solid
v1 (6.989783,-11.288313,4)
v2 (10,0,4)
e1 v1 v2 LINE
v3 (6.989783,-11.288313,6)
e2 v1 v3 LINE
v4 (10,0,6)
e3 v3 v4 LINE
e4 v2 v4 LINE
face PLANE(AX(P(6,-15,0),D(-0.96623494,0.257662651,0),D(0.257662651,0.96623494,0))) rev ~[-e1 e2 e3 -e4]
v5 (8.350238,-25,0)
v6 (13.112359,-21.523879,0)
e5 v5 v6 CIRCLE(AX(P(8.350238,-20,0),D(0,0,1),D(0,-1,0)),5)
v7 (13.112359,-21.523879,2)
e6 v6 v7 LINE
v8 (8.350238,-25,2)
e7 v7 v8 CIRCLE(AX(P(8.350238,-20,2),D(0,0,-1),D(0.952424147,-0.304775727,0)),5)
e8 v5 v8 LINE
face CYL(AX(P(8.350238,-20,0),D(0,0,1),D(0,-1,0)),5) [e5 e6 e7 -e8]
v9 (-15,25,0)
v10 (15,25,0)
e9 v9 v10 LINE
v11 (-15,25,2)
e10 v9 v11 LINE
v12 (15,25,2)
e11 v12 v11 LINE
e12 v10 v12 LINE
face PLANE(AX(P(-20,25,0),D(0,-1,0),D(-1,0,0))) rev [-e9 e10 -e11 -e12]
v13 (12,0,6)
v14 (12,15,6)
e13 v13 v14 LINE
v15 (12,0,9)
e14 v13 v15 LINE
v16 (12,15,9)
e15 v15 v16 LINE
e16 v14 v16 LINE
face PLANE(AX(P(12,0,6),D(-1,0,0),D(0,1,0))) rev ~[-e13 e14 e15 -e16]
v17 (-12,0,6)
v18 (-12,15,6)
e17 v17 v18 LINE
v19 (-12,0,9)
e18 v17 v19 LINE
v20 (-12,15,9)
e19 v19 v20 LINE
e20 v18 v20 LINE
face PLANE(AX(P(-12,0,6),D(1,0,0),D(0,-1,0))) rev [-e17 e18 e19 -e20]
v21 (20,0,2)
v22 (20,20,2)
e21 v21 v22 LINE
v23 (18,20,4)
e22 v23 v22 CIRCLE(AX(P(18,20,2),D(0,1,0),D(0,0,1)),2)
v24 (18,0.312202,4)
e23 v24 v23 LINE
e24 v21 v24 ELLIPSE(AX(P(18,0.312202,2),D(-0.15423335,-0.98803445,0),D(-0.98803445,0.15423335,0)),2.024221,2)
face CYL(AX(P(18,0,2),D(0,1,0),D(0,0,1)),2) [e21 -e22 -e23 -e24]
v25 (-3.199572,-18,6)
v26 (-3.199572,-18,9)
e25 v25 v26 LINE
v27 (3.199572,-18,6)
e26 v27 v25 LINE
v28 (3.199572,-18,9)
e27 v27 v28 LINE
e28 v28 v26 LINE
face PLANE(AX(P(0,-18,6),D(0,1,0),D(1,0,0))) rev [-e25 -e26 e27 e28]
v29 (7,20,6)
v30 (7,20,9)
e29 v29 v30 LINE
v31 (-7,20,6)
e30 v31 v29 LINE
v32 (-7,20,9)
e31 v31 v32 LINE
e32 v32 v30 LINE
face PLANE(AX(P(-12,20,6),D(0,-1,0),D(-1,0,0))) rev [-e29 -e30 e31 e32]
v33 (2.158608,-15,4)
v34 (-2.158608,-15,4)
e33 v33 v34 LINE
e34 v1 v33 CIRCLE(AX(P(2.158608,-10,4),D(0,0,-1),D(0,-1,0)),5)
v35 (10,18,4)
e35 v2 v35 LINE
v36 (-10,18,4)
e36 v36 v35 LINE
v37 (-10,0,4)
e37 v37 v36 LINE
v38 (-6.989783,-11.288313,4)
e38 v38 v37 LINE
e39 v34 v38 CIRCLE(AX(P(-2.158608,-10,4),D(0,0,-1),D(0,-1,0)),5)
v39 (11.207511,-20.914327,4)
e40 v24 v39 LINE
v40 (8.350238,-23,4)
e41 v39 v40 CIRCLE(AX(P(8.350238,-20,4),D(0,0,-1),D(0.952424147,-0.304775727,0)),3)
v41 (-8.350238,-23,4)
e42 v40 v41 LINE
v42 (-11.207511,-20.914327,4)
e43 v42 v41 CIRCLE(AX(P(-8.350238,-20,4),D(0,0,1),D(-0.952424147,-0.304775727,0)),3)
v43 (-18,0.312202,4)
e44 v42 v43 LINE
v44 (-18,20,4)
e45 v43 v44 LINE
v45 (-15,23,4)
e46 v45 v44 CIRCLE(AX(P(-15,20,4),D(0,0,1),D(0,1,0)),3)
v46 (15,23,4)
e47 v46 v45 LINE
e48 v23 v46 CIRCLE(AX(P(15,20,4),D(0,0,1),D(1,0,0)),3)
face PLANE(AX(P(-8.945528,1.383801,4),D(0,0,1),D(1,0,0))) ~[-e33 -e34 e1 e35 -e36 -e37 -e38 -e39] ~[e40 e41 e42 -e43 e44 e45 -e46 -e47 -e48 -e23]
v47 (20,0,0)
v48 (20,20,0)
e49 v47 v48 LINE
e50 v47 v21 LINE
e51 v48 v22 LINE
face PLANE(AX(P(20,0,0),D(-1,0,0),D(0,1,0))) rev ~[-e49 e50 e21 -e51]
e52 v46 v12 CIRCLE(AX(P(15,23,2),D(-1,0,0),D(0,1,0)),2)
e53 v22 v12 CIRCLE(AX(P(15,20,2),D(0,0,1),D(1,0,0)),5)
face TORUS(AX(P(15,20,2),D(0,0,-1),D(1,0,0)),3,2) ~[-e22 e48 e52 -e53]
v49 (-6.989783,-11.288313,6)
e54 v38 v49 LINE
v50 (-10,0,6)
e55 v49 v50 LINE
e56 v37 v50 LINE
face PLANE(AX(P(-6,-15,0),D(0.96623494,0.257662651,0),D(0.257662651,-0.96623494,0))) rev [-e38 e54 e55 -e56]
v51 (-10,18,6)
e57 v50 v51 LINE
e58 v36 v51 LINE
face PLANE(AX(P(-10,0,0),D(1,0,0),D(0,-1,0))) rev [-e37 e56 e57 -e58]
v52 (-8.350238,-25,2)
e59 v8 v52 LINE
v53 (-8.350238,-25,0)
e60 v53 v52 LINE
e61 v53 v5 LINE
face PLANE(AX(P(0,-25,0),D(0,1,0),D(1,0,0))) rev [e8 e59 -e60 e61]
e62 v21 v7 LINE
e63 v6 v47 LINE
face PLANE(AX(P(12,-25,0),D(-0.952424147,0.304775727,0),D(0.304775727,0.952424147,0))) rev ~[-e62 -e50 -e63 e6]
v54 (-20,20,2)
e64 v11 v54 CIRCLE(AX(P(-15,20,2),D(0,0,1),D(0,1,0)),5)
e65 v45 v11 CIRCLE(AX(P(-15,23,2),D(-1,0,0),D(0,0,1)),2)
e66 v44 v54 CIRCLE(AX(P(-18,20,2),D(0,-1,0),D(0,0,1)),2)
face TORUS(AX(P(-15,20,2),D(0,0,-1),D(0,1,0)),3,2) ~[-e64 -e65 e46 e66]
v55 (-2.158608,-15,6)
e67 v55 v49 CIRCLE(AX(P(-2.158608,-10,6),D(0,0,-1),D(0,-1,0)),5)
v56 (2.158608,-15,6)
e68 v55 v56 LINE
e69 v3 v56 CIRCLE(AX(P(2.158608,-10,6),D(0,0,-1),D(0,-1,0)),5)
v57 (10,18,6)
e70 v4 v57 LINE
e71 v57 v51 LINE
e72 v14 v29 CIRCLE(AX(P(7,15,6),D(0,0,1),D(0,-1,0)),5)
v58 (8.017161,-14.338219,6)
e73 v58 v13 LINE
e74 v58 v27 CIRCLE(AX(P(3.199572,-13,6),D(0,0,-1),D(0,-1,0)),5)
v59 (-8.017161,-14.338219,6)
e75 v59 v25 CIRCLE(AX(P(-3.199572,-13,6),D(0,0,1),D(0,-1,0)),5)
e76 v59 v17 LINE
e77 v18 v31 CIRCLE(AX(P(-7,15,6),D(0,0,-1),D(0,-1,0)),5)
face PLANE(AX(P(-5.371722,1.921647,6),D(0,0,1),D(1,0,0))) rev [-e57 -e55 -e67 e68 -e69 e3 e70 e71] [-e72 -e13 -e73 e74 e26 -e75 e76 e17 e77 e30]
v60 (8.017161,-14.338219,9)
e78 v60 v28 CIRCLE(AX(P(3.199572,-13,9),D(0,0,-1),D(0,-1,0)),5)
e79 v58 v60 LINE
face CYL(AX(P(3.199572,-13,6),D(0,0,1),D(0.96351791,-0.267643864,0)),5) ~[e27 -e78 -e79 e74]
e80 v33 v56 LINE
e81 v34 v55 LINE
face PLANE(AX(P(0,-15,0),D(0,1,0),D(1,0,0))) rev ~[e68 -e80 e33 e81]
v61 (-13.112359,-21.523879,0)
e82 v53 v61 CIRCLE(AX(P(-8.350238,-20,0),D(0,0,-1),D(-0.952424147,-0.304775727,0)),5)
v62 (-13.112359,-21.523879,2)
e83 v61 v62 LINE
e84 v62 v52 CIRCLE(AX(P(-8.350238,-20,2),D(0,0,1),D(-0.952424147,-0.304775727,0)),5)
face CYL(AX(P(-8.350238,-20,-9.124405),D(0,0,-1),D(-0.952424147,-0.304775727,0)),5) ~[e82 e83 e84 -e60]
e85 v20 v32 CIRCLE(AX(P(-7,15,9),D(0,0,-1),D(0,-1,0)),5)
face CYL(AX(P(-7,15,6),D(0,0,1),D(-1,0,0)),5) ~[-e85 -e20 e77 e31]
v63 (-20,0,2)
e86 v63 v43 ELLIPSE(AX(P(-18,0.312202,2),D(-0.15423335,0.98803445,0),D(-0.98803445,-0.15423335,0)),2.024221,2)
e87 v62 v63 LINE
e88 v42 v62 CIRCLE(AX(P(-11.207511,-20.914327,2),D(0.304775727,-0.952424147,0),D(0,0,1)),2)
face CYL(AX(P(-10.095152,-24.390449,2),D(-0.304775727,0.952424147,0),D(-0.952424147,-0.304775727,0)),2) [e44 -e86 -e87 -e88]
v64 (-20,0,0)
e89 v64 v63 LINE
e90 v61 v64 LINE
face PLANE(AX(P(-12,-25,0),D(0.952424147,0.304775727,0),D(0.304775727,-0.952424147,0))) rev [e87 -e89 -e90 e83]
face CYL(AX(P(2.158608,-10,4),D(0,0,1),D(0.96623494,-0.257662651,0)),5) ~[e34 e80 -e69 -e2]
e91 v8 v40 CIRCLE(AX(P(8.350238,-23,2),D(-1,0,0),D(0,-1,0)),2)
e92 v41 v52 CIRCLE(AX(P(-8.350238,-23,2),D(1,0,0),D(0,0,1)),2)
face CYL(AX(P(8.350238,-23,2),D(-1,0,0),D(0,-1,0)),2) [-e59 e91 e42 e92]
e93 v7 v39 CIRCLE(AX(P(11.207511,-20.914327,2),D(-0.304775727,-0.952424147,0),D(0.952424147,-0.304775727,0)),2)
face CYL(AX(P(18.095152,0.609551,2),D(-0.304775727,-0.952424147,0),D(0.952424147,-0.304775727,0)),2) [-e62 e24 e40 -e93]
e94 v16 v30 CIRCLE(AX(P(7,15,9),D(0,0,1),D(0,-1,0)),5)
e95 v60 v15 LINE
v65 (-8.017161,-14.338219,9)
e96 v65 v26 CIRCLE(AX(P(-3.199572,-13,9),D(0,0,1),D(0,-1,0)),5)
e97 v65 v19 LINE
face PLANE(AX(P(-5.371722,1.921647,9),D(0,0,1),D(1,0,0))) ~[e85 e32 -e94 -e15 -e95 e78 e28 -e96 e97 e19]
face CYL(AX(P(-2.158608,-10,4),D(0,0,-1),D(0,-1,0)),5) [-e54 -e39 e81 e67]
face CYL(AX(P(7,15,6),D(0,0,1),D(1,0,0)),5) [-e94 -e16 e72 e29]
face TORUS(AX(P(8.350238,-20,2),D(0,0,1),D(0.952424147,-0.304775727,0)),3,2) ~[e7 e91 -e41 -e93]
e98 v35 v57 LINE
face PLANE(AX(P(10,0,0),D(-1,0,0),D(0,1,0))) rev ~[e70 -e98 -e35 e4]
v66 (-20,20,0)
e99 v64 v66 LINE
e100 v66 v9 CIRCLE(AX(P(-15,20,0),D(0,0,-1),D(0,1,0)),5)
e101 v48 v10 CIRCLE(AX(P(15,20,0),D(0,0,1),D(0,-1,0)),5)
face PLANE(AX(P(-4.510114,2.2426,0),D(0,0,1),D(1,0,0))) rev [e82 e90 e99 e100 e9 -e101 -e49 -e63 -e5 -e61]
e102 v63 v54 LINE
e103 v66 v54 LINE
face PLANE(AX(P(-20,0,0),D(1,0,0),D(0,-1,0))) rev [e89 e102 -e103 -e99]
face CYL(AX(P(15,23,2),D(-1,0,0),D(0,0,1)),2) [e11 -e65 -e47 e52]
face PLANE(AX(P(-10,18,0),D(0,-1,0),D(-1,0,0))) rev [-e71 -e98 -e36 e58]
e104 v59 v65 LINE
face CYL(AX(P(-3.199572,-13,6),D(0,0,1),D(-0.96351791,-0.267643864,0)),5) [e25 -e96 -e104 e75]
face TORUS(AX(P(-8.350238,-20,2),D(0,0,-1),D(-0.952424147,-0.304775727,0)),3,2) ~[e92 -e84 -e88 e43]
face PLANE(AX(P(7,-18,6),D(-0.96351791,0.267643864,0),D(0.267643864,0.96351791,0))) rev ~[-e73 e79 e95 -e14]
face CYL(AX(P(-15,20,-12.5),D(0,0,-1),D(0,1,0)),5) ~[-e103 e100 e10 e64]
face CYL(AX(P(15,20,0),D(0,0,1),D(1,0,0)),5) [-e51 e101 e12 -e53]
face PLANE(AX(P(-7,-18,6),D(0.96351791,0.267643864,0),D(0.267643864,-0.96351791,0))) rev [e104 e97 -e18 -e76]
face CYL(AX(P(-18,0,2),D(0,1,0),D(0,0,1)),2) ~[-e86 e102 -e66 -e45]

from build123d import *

# Parameters (mm, degrees)
F1_DEPTH        = 4
F2_R            = 5
F3_R            = 2
F5_DEPTH        = 6
F6_R            = 5
F8_DEPTH        = 3
F10_F1_R        = 5
F10_F2_R        = 5
F10_2_T1_DEPTH  = 11.6034789136
F10_2_T3_DEPTH  = 16.5
F10_2_T5_DEPTH  = 13.1244047484
F10_2_T8_ANGLE  = 72.2553283749
F10_2_T10_ANGLE = 90


# Not quite as in the source:
# - a fillet or chamfer that OpenCascade refuses, or shapes differently, is made with other operations: its cross-section is extruded or revolved along the edge and cut away or added
# - a pattern or mirror of a feature is missing from the dataset's text; its kind, count and spacing are read off the source's solid


with BuildPart() as f1:
    # F0 (on Top) → F1 (new body)
    with BuildSketch(Plane.XY):
        Polygon((0, 25), (0, 0), (0, -25), (12, -25), (20, 0), (20, 25), align=None)
    extrude(amount=F1_DEPTH)

    # F1_copies: F1 across plane


with BuildPart() as f1_1:
    add(f1.part)
    add(f1.part.mirror(Plane(origin=(0, 0, 0), x_dir=(0, 0, -1), z_dir=(-1, 0, 0))))

    # F2
    f2_edges = [f1_1.edges().sort_by_distance(p)[0] for p in [
        (12, -25, 2),
        (20, 25, 2),
    ]]
    fillet(f2_edges, radius=F2_R)

    # F3
    f3_edges = [f1_1.edges().sort_by_distance(p)[0] for p in [
        (-1.824881, -25, 4),
        (20, 10, 4),
        (11.29817, -24.038527, 4),
        (-16, -12.5, 4),
        (16.556179, -10.761939, 4),
        (-20, 12.5, 4),
        (-2.5, 25, 4),
        (18.535534, 23.535534, 4),
    ]]
    fillet(f3_edges, radius=F3_R)

    # F4 (on Top) → F5 (join)
    with BuildSketch(Plane.XY):
        Polygon((0, 18), (0, 0), (0, -15), (6, -15), (10, 0), (10, 18), align=None)
    f5 = extrude(amount=F5_DEPTH)

    # F5_copies: F5 across plane
    add(f5.mirror(Plane(origin=(0, 0, 0), x_dir=(0, 0, -1), z_dir=(-1, 0, 0))))

    # F6
    f6_edges = [f1_1.edges().sort_by_distance(p)[0] for p in [
        (6, -15, 5),
    ]]
    fillet(f6_edges, radius=F6_R)

    # F10#2: fillet of radius 5 on 3 edges, made by hand

    # F10_2_s2 → F10_2_t1 (cut)
    with BuildSketch(Plane.XY.offset(4)):
        with BuildLine():
            ThreePointArc((-2.1586084346, -15), (-5.2047891364, -13.9649442785), (-6.9897831326, -11.2883132528))
            Line((-6.9897831326, -11.2883132528), (-6, -15))
            Line((-6, -15), (-2.1586084346, -15))
        make_face()
    extrude(amount=F10_2_T1_DEPTH, mode=Mode.SUBTRACT)

    # F10_2_s4 → F10_2_t3 (cut)
    with BuildSketch(Plane.XY.offset(-12.5)):
        with BuildLine():
            ThreePointArc((-15, 25), (-18.5355339059, 23.5355339059), (-20, 20))
            Line((-20, 20), (-20, 25))
            Line((-20, 25), (-15, 25))
        make_face()
    extrude(amount=F10_2_T3_DEPTH, mode=Mode.SUBTRACT)

    # F10_2_s6 → F10_2_t5 (cut)
    with BuildSketch(Plane.XY.offset(-9.1244047484)):
        with BuildLine():
            ThreePointArc((-13.1123588366, -21.5238786355), (-11.2981701574, -24.0385265368), (-8.3502381006, -25))
            Line((-8.3502381006, -25), (-12, -25))
            Line((-12, -25), (-13.1123588366, -21.5238786355))
        make_face()
    extrude(amount=F10_2_T5_DEPTH, mode=Mode.SUBTRACT)

    # F10_2_s7 → F10_2_t8 (revolve, cut)
    with BuildSketch(Plane(origin=(5.0298762867, -15.718363396, 0), x_dir=(0, 0, 1), z_dir=(-0.3047757271, 0.9524241472, 0))):
        with BuildLine():
            ThreePointArc((4, -17.048482944), (3.4142135624, -18.4626965064), (2, -19.048482944))
            Line((2, -19.048482944), (4, -19.048482944))
            Line((4, -19.048482944), (4, -17.048482944))
        make_face()
    revolve(axis=Axis((-8.3502381006, -20, 4), (0, 0, 1)), revolution_arc=F10_2_T8_ANGLE, mode=Mode.SUBTRACT)

    # F10_2_s9 → F10_2_t10 (revolve, cut)
    with BuildSketch(Plane.YZ.offset(-15)):
        with BuildLine():
            ThreePointArc((23, 4), (24.4142135624, 3.4142135624), (25, 2))
            Line((25, 2), (25, 4))
            Line((25, 4), (23, 4))
        make_face()
    revolve(axis=Axis((-15, 20, 4), (0, 0, 1)), revolution_arc=F10_2_T10_ANGLE, mode=Mode.SUBTRACT)



with BuildPart() as f8:
    # F7 (on Top) → F8 (new body)
    with BuildSketch(Plane.XY):
        Polygon((0, 20), (0, 0), (0, -18), (7, -18), (12, 0), (12, 20), align=None)
    extrude(amount=F8_DEPTH)


with BuildPart() as f8_1:
    # F9: moved
    add(f8.part.moved(Location((0, 0, 6))))

    # F10: fillet of radius 5 on 2 edges, made by hand

    # F10_f1
    f10_f1_edges = [f8_1.edges().sort_by_distance(p)[0] for p in [
        (12, 20, 7.5),
    ]]
    fillet(f10_f1_edges, radius=F10_F1_R)

    # F10_f2
    f10_f2_edges = [f8_1.edges().sort_by_distance(p)[0] for p in [
        (7, -18, 7.5),
    ]]
    fillet(f10_f2_edges, radius=F10_F2_R)


with BuildPart() as f1_2:
    add(f1_1.part)

    add(f8_1.part)  # F11 merges F8
    # F11: F8 across plane
    add(f8_1.part.mirror(Plane.YZ))


solid = f1_2.part
